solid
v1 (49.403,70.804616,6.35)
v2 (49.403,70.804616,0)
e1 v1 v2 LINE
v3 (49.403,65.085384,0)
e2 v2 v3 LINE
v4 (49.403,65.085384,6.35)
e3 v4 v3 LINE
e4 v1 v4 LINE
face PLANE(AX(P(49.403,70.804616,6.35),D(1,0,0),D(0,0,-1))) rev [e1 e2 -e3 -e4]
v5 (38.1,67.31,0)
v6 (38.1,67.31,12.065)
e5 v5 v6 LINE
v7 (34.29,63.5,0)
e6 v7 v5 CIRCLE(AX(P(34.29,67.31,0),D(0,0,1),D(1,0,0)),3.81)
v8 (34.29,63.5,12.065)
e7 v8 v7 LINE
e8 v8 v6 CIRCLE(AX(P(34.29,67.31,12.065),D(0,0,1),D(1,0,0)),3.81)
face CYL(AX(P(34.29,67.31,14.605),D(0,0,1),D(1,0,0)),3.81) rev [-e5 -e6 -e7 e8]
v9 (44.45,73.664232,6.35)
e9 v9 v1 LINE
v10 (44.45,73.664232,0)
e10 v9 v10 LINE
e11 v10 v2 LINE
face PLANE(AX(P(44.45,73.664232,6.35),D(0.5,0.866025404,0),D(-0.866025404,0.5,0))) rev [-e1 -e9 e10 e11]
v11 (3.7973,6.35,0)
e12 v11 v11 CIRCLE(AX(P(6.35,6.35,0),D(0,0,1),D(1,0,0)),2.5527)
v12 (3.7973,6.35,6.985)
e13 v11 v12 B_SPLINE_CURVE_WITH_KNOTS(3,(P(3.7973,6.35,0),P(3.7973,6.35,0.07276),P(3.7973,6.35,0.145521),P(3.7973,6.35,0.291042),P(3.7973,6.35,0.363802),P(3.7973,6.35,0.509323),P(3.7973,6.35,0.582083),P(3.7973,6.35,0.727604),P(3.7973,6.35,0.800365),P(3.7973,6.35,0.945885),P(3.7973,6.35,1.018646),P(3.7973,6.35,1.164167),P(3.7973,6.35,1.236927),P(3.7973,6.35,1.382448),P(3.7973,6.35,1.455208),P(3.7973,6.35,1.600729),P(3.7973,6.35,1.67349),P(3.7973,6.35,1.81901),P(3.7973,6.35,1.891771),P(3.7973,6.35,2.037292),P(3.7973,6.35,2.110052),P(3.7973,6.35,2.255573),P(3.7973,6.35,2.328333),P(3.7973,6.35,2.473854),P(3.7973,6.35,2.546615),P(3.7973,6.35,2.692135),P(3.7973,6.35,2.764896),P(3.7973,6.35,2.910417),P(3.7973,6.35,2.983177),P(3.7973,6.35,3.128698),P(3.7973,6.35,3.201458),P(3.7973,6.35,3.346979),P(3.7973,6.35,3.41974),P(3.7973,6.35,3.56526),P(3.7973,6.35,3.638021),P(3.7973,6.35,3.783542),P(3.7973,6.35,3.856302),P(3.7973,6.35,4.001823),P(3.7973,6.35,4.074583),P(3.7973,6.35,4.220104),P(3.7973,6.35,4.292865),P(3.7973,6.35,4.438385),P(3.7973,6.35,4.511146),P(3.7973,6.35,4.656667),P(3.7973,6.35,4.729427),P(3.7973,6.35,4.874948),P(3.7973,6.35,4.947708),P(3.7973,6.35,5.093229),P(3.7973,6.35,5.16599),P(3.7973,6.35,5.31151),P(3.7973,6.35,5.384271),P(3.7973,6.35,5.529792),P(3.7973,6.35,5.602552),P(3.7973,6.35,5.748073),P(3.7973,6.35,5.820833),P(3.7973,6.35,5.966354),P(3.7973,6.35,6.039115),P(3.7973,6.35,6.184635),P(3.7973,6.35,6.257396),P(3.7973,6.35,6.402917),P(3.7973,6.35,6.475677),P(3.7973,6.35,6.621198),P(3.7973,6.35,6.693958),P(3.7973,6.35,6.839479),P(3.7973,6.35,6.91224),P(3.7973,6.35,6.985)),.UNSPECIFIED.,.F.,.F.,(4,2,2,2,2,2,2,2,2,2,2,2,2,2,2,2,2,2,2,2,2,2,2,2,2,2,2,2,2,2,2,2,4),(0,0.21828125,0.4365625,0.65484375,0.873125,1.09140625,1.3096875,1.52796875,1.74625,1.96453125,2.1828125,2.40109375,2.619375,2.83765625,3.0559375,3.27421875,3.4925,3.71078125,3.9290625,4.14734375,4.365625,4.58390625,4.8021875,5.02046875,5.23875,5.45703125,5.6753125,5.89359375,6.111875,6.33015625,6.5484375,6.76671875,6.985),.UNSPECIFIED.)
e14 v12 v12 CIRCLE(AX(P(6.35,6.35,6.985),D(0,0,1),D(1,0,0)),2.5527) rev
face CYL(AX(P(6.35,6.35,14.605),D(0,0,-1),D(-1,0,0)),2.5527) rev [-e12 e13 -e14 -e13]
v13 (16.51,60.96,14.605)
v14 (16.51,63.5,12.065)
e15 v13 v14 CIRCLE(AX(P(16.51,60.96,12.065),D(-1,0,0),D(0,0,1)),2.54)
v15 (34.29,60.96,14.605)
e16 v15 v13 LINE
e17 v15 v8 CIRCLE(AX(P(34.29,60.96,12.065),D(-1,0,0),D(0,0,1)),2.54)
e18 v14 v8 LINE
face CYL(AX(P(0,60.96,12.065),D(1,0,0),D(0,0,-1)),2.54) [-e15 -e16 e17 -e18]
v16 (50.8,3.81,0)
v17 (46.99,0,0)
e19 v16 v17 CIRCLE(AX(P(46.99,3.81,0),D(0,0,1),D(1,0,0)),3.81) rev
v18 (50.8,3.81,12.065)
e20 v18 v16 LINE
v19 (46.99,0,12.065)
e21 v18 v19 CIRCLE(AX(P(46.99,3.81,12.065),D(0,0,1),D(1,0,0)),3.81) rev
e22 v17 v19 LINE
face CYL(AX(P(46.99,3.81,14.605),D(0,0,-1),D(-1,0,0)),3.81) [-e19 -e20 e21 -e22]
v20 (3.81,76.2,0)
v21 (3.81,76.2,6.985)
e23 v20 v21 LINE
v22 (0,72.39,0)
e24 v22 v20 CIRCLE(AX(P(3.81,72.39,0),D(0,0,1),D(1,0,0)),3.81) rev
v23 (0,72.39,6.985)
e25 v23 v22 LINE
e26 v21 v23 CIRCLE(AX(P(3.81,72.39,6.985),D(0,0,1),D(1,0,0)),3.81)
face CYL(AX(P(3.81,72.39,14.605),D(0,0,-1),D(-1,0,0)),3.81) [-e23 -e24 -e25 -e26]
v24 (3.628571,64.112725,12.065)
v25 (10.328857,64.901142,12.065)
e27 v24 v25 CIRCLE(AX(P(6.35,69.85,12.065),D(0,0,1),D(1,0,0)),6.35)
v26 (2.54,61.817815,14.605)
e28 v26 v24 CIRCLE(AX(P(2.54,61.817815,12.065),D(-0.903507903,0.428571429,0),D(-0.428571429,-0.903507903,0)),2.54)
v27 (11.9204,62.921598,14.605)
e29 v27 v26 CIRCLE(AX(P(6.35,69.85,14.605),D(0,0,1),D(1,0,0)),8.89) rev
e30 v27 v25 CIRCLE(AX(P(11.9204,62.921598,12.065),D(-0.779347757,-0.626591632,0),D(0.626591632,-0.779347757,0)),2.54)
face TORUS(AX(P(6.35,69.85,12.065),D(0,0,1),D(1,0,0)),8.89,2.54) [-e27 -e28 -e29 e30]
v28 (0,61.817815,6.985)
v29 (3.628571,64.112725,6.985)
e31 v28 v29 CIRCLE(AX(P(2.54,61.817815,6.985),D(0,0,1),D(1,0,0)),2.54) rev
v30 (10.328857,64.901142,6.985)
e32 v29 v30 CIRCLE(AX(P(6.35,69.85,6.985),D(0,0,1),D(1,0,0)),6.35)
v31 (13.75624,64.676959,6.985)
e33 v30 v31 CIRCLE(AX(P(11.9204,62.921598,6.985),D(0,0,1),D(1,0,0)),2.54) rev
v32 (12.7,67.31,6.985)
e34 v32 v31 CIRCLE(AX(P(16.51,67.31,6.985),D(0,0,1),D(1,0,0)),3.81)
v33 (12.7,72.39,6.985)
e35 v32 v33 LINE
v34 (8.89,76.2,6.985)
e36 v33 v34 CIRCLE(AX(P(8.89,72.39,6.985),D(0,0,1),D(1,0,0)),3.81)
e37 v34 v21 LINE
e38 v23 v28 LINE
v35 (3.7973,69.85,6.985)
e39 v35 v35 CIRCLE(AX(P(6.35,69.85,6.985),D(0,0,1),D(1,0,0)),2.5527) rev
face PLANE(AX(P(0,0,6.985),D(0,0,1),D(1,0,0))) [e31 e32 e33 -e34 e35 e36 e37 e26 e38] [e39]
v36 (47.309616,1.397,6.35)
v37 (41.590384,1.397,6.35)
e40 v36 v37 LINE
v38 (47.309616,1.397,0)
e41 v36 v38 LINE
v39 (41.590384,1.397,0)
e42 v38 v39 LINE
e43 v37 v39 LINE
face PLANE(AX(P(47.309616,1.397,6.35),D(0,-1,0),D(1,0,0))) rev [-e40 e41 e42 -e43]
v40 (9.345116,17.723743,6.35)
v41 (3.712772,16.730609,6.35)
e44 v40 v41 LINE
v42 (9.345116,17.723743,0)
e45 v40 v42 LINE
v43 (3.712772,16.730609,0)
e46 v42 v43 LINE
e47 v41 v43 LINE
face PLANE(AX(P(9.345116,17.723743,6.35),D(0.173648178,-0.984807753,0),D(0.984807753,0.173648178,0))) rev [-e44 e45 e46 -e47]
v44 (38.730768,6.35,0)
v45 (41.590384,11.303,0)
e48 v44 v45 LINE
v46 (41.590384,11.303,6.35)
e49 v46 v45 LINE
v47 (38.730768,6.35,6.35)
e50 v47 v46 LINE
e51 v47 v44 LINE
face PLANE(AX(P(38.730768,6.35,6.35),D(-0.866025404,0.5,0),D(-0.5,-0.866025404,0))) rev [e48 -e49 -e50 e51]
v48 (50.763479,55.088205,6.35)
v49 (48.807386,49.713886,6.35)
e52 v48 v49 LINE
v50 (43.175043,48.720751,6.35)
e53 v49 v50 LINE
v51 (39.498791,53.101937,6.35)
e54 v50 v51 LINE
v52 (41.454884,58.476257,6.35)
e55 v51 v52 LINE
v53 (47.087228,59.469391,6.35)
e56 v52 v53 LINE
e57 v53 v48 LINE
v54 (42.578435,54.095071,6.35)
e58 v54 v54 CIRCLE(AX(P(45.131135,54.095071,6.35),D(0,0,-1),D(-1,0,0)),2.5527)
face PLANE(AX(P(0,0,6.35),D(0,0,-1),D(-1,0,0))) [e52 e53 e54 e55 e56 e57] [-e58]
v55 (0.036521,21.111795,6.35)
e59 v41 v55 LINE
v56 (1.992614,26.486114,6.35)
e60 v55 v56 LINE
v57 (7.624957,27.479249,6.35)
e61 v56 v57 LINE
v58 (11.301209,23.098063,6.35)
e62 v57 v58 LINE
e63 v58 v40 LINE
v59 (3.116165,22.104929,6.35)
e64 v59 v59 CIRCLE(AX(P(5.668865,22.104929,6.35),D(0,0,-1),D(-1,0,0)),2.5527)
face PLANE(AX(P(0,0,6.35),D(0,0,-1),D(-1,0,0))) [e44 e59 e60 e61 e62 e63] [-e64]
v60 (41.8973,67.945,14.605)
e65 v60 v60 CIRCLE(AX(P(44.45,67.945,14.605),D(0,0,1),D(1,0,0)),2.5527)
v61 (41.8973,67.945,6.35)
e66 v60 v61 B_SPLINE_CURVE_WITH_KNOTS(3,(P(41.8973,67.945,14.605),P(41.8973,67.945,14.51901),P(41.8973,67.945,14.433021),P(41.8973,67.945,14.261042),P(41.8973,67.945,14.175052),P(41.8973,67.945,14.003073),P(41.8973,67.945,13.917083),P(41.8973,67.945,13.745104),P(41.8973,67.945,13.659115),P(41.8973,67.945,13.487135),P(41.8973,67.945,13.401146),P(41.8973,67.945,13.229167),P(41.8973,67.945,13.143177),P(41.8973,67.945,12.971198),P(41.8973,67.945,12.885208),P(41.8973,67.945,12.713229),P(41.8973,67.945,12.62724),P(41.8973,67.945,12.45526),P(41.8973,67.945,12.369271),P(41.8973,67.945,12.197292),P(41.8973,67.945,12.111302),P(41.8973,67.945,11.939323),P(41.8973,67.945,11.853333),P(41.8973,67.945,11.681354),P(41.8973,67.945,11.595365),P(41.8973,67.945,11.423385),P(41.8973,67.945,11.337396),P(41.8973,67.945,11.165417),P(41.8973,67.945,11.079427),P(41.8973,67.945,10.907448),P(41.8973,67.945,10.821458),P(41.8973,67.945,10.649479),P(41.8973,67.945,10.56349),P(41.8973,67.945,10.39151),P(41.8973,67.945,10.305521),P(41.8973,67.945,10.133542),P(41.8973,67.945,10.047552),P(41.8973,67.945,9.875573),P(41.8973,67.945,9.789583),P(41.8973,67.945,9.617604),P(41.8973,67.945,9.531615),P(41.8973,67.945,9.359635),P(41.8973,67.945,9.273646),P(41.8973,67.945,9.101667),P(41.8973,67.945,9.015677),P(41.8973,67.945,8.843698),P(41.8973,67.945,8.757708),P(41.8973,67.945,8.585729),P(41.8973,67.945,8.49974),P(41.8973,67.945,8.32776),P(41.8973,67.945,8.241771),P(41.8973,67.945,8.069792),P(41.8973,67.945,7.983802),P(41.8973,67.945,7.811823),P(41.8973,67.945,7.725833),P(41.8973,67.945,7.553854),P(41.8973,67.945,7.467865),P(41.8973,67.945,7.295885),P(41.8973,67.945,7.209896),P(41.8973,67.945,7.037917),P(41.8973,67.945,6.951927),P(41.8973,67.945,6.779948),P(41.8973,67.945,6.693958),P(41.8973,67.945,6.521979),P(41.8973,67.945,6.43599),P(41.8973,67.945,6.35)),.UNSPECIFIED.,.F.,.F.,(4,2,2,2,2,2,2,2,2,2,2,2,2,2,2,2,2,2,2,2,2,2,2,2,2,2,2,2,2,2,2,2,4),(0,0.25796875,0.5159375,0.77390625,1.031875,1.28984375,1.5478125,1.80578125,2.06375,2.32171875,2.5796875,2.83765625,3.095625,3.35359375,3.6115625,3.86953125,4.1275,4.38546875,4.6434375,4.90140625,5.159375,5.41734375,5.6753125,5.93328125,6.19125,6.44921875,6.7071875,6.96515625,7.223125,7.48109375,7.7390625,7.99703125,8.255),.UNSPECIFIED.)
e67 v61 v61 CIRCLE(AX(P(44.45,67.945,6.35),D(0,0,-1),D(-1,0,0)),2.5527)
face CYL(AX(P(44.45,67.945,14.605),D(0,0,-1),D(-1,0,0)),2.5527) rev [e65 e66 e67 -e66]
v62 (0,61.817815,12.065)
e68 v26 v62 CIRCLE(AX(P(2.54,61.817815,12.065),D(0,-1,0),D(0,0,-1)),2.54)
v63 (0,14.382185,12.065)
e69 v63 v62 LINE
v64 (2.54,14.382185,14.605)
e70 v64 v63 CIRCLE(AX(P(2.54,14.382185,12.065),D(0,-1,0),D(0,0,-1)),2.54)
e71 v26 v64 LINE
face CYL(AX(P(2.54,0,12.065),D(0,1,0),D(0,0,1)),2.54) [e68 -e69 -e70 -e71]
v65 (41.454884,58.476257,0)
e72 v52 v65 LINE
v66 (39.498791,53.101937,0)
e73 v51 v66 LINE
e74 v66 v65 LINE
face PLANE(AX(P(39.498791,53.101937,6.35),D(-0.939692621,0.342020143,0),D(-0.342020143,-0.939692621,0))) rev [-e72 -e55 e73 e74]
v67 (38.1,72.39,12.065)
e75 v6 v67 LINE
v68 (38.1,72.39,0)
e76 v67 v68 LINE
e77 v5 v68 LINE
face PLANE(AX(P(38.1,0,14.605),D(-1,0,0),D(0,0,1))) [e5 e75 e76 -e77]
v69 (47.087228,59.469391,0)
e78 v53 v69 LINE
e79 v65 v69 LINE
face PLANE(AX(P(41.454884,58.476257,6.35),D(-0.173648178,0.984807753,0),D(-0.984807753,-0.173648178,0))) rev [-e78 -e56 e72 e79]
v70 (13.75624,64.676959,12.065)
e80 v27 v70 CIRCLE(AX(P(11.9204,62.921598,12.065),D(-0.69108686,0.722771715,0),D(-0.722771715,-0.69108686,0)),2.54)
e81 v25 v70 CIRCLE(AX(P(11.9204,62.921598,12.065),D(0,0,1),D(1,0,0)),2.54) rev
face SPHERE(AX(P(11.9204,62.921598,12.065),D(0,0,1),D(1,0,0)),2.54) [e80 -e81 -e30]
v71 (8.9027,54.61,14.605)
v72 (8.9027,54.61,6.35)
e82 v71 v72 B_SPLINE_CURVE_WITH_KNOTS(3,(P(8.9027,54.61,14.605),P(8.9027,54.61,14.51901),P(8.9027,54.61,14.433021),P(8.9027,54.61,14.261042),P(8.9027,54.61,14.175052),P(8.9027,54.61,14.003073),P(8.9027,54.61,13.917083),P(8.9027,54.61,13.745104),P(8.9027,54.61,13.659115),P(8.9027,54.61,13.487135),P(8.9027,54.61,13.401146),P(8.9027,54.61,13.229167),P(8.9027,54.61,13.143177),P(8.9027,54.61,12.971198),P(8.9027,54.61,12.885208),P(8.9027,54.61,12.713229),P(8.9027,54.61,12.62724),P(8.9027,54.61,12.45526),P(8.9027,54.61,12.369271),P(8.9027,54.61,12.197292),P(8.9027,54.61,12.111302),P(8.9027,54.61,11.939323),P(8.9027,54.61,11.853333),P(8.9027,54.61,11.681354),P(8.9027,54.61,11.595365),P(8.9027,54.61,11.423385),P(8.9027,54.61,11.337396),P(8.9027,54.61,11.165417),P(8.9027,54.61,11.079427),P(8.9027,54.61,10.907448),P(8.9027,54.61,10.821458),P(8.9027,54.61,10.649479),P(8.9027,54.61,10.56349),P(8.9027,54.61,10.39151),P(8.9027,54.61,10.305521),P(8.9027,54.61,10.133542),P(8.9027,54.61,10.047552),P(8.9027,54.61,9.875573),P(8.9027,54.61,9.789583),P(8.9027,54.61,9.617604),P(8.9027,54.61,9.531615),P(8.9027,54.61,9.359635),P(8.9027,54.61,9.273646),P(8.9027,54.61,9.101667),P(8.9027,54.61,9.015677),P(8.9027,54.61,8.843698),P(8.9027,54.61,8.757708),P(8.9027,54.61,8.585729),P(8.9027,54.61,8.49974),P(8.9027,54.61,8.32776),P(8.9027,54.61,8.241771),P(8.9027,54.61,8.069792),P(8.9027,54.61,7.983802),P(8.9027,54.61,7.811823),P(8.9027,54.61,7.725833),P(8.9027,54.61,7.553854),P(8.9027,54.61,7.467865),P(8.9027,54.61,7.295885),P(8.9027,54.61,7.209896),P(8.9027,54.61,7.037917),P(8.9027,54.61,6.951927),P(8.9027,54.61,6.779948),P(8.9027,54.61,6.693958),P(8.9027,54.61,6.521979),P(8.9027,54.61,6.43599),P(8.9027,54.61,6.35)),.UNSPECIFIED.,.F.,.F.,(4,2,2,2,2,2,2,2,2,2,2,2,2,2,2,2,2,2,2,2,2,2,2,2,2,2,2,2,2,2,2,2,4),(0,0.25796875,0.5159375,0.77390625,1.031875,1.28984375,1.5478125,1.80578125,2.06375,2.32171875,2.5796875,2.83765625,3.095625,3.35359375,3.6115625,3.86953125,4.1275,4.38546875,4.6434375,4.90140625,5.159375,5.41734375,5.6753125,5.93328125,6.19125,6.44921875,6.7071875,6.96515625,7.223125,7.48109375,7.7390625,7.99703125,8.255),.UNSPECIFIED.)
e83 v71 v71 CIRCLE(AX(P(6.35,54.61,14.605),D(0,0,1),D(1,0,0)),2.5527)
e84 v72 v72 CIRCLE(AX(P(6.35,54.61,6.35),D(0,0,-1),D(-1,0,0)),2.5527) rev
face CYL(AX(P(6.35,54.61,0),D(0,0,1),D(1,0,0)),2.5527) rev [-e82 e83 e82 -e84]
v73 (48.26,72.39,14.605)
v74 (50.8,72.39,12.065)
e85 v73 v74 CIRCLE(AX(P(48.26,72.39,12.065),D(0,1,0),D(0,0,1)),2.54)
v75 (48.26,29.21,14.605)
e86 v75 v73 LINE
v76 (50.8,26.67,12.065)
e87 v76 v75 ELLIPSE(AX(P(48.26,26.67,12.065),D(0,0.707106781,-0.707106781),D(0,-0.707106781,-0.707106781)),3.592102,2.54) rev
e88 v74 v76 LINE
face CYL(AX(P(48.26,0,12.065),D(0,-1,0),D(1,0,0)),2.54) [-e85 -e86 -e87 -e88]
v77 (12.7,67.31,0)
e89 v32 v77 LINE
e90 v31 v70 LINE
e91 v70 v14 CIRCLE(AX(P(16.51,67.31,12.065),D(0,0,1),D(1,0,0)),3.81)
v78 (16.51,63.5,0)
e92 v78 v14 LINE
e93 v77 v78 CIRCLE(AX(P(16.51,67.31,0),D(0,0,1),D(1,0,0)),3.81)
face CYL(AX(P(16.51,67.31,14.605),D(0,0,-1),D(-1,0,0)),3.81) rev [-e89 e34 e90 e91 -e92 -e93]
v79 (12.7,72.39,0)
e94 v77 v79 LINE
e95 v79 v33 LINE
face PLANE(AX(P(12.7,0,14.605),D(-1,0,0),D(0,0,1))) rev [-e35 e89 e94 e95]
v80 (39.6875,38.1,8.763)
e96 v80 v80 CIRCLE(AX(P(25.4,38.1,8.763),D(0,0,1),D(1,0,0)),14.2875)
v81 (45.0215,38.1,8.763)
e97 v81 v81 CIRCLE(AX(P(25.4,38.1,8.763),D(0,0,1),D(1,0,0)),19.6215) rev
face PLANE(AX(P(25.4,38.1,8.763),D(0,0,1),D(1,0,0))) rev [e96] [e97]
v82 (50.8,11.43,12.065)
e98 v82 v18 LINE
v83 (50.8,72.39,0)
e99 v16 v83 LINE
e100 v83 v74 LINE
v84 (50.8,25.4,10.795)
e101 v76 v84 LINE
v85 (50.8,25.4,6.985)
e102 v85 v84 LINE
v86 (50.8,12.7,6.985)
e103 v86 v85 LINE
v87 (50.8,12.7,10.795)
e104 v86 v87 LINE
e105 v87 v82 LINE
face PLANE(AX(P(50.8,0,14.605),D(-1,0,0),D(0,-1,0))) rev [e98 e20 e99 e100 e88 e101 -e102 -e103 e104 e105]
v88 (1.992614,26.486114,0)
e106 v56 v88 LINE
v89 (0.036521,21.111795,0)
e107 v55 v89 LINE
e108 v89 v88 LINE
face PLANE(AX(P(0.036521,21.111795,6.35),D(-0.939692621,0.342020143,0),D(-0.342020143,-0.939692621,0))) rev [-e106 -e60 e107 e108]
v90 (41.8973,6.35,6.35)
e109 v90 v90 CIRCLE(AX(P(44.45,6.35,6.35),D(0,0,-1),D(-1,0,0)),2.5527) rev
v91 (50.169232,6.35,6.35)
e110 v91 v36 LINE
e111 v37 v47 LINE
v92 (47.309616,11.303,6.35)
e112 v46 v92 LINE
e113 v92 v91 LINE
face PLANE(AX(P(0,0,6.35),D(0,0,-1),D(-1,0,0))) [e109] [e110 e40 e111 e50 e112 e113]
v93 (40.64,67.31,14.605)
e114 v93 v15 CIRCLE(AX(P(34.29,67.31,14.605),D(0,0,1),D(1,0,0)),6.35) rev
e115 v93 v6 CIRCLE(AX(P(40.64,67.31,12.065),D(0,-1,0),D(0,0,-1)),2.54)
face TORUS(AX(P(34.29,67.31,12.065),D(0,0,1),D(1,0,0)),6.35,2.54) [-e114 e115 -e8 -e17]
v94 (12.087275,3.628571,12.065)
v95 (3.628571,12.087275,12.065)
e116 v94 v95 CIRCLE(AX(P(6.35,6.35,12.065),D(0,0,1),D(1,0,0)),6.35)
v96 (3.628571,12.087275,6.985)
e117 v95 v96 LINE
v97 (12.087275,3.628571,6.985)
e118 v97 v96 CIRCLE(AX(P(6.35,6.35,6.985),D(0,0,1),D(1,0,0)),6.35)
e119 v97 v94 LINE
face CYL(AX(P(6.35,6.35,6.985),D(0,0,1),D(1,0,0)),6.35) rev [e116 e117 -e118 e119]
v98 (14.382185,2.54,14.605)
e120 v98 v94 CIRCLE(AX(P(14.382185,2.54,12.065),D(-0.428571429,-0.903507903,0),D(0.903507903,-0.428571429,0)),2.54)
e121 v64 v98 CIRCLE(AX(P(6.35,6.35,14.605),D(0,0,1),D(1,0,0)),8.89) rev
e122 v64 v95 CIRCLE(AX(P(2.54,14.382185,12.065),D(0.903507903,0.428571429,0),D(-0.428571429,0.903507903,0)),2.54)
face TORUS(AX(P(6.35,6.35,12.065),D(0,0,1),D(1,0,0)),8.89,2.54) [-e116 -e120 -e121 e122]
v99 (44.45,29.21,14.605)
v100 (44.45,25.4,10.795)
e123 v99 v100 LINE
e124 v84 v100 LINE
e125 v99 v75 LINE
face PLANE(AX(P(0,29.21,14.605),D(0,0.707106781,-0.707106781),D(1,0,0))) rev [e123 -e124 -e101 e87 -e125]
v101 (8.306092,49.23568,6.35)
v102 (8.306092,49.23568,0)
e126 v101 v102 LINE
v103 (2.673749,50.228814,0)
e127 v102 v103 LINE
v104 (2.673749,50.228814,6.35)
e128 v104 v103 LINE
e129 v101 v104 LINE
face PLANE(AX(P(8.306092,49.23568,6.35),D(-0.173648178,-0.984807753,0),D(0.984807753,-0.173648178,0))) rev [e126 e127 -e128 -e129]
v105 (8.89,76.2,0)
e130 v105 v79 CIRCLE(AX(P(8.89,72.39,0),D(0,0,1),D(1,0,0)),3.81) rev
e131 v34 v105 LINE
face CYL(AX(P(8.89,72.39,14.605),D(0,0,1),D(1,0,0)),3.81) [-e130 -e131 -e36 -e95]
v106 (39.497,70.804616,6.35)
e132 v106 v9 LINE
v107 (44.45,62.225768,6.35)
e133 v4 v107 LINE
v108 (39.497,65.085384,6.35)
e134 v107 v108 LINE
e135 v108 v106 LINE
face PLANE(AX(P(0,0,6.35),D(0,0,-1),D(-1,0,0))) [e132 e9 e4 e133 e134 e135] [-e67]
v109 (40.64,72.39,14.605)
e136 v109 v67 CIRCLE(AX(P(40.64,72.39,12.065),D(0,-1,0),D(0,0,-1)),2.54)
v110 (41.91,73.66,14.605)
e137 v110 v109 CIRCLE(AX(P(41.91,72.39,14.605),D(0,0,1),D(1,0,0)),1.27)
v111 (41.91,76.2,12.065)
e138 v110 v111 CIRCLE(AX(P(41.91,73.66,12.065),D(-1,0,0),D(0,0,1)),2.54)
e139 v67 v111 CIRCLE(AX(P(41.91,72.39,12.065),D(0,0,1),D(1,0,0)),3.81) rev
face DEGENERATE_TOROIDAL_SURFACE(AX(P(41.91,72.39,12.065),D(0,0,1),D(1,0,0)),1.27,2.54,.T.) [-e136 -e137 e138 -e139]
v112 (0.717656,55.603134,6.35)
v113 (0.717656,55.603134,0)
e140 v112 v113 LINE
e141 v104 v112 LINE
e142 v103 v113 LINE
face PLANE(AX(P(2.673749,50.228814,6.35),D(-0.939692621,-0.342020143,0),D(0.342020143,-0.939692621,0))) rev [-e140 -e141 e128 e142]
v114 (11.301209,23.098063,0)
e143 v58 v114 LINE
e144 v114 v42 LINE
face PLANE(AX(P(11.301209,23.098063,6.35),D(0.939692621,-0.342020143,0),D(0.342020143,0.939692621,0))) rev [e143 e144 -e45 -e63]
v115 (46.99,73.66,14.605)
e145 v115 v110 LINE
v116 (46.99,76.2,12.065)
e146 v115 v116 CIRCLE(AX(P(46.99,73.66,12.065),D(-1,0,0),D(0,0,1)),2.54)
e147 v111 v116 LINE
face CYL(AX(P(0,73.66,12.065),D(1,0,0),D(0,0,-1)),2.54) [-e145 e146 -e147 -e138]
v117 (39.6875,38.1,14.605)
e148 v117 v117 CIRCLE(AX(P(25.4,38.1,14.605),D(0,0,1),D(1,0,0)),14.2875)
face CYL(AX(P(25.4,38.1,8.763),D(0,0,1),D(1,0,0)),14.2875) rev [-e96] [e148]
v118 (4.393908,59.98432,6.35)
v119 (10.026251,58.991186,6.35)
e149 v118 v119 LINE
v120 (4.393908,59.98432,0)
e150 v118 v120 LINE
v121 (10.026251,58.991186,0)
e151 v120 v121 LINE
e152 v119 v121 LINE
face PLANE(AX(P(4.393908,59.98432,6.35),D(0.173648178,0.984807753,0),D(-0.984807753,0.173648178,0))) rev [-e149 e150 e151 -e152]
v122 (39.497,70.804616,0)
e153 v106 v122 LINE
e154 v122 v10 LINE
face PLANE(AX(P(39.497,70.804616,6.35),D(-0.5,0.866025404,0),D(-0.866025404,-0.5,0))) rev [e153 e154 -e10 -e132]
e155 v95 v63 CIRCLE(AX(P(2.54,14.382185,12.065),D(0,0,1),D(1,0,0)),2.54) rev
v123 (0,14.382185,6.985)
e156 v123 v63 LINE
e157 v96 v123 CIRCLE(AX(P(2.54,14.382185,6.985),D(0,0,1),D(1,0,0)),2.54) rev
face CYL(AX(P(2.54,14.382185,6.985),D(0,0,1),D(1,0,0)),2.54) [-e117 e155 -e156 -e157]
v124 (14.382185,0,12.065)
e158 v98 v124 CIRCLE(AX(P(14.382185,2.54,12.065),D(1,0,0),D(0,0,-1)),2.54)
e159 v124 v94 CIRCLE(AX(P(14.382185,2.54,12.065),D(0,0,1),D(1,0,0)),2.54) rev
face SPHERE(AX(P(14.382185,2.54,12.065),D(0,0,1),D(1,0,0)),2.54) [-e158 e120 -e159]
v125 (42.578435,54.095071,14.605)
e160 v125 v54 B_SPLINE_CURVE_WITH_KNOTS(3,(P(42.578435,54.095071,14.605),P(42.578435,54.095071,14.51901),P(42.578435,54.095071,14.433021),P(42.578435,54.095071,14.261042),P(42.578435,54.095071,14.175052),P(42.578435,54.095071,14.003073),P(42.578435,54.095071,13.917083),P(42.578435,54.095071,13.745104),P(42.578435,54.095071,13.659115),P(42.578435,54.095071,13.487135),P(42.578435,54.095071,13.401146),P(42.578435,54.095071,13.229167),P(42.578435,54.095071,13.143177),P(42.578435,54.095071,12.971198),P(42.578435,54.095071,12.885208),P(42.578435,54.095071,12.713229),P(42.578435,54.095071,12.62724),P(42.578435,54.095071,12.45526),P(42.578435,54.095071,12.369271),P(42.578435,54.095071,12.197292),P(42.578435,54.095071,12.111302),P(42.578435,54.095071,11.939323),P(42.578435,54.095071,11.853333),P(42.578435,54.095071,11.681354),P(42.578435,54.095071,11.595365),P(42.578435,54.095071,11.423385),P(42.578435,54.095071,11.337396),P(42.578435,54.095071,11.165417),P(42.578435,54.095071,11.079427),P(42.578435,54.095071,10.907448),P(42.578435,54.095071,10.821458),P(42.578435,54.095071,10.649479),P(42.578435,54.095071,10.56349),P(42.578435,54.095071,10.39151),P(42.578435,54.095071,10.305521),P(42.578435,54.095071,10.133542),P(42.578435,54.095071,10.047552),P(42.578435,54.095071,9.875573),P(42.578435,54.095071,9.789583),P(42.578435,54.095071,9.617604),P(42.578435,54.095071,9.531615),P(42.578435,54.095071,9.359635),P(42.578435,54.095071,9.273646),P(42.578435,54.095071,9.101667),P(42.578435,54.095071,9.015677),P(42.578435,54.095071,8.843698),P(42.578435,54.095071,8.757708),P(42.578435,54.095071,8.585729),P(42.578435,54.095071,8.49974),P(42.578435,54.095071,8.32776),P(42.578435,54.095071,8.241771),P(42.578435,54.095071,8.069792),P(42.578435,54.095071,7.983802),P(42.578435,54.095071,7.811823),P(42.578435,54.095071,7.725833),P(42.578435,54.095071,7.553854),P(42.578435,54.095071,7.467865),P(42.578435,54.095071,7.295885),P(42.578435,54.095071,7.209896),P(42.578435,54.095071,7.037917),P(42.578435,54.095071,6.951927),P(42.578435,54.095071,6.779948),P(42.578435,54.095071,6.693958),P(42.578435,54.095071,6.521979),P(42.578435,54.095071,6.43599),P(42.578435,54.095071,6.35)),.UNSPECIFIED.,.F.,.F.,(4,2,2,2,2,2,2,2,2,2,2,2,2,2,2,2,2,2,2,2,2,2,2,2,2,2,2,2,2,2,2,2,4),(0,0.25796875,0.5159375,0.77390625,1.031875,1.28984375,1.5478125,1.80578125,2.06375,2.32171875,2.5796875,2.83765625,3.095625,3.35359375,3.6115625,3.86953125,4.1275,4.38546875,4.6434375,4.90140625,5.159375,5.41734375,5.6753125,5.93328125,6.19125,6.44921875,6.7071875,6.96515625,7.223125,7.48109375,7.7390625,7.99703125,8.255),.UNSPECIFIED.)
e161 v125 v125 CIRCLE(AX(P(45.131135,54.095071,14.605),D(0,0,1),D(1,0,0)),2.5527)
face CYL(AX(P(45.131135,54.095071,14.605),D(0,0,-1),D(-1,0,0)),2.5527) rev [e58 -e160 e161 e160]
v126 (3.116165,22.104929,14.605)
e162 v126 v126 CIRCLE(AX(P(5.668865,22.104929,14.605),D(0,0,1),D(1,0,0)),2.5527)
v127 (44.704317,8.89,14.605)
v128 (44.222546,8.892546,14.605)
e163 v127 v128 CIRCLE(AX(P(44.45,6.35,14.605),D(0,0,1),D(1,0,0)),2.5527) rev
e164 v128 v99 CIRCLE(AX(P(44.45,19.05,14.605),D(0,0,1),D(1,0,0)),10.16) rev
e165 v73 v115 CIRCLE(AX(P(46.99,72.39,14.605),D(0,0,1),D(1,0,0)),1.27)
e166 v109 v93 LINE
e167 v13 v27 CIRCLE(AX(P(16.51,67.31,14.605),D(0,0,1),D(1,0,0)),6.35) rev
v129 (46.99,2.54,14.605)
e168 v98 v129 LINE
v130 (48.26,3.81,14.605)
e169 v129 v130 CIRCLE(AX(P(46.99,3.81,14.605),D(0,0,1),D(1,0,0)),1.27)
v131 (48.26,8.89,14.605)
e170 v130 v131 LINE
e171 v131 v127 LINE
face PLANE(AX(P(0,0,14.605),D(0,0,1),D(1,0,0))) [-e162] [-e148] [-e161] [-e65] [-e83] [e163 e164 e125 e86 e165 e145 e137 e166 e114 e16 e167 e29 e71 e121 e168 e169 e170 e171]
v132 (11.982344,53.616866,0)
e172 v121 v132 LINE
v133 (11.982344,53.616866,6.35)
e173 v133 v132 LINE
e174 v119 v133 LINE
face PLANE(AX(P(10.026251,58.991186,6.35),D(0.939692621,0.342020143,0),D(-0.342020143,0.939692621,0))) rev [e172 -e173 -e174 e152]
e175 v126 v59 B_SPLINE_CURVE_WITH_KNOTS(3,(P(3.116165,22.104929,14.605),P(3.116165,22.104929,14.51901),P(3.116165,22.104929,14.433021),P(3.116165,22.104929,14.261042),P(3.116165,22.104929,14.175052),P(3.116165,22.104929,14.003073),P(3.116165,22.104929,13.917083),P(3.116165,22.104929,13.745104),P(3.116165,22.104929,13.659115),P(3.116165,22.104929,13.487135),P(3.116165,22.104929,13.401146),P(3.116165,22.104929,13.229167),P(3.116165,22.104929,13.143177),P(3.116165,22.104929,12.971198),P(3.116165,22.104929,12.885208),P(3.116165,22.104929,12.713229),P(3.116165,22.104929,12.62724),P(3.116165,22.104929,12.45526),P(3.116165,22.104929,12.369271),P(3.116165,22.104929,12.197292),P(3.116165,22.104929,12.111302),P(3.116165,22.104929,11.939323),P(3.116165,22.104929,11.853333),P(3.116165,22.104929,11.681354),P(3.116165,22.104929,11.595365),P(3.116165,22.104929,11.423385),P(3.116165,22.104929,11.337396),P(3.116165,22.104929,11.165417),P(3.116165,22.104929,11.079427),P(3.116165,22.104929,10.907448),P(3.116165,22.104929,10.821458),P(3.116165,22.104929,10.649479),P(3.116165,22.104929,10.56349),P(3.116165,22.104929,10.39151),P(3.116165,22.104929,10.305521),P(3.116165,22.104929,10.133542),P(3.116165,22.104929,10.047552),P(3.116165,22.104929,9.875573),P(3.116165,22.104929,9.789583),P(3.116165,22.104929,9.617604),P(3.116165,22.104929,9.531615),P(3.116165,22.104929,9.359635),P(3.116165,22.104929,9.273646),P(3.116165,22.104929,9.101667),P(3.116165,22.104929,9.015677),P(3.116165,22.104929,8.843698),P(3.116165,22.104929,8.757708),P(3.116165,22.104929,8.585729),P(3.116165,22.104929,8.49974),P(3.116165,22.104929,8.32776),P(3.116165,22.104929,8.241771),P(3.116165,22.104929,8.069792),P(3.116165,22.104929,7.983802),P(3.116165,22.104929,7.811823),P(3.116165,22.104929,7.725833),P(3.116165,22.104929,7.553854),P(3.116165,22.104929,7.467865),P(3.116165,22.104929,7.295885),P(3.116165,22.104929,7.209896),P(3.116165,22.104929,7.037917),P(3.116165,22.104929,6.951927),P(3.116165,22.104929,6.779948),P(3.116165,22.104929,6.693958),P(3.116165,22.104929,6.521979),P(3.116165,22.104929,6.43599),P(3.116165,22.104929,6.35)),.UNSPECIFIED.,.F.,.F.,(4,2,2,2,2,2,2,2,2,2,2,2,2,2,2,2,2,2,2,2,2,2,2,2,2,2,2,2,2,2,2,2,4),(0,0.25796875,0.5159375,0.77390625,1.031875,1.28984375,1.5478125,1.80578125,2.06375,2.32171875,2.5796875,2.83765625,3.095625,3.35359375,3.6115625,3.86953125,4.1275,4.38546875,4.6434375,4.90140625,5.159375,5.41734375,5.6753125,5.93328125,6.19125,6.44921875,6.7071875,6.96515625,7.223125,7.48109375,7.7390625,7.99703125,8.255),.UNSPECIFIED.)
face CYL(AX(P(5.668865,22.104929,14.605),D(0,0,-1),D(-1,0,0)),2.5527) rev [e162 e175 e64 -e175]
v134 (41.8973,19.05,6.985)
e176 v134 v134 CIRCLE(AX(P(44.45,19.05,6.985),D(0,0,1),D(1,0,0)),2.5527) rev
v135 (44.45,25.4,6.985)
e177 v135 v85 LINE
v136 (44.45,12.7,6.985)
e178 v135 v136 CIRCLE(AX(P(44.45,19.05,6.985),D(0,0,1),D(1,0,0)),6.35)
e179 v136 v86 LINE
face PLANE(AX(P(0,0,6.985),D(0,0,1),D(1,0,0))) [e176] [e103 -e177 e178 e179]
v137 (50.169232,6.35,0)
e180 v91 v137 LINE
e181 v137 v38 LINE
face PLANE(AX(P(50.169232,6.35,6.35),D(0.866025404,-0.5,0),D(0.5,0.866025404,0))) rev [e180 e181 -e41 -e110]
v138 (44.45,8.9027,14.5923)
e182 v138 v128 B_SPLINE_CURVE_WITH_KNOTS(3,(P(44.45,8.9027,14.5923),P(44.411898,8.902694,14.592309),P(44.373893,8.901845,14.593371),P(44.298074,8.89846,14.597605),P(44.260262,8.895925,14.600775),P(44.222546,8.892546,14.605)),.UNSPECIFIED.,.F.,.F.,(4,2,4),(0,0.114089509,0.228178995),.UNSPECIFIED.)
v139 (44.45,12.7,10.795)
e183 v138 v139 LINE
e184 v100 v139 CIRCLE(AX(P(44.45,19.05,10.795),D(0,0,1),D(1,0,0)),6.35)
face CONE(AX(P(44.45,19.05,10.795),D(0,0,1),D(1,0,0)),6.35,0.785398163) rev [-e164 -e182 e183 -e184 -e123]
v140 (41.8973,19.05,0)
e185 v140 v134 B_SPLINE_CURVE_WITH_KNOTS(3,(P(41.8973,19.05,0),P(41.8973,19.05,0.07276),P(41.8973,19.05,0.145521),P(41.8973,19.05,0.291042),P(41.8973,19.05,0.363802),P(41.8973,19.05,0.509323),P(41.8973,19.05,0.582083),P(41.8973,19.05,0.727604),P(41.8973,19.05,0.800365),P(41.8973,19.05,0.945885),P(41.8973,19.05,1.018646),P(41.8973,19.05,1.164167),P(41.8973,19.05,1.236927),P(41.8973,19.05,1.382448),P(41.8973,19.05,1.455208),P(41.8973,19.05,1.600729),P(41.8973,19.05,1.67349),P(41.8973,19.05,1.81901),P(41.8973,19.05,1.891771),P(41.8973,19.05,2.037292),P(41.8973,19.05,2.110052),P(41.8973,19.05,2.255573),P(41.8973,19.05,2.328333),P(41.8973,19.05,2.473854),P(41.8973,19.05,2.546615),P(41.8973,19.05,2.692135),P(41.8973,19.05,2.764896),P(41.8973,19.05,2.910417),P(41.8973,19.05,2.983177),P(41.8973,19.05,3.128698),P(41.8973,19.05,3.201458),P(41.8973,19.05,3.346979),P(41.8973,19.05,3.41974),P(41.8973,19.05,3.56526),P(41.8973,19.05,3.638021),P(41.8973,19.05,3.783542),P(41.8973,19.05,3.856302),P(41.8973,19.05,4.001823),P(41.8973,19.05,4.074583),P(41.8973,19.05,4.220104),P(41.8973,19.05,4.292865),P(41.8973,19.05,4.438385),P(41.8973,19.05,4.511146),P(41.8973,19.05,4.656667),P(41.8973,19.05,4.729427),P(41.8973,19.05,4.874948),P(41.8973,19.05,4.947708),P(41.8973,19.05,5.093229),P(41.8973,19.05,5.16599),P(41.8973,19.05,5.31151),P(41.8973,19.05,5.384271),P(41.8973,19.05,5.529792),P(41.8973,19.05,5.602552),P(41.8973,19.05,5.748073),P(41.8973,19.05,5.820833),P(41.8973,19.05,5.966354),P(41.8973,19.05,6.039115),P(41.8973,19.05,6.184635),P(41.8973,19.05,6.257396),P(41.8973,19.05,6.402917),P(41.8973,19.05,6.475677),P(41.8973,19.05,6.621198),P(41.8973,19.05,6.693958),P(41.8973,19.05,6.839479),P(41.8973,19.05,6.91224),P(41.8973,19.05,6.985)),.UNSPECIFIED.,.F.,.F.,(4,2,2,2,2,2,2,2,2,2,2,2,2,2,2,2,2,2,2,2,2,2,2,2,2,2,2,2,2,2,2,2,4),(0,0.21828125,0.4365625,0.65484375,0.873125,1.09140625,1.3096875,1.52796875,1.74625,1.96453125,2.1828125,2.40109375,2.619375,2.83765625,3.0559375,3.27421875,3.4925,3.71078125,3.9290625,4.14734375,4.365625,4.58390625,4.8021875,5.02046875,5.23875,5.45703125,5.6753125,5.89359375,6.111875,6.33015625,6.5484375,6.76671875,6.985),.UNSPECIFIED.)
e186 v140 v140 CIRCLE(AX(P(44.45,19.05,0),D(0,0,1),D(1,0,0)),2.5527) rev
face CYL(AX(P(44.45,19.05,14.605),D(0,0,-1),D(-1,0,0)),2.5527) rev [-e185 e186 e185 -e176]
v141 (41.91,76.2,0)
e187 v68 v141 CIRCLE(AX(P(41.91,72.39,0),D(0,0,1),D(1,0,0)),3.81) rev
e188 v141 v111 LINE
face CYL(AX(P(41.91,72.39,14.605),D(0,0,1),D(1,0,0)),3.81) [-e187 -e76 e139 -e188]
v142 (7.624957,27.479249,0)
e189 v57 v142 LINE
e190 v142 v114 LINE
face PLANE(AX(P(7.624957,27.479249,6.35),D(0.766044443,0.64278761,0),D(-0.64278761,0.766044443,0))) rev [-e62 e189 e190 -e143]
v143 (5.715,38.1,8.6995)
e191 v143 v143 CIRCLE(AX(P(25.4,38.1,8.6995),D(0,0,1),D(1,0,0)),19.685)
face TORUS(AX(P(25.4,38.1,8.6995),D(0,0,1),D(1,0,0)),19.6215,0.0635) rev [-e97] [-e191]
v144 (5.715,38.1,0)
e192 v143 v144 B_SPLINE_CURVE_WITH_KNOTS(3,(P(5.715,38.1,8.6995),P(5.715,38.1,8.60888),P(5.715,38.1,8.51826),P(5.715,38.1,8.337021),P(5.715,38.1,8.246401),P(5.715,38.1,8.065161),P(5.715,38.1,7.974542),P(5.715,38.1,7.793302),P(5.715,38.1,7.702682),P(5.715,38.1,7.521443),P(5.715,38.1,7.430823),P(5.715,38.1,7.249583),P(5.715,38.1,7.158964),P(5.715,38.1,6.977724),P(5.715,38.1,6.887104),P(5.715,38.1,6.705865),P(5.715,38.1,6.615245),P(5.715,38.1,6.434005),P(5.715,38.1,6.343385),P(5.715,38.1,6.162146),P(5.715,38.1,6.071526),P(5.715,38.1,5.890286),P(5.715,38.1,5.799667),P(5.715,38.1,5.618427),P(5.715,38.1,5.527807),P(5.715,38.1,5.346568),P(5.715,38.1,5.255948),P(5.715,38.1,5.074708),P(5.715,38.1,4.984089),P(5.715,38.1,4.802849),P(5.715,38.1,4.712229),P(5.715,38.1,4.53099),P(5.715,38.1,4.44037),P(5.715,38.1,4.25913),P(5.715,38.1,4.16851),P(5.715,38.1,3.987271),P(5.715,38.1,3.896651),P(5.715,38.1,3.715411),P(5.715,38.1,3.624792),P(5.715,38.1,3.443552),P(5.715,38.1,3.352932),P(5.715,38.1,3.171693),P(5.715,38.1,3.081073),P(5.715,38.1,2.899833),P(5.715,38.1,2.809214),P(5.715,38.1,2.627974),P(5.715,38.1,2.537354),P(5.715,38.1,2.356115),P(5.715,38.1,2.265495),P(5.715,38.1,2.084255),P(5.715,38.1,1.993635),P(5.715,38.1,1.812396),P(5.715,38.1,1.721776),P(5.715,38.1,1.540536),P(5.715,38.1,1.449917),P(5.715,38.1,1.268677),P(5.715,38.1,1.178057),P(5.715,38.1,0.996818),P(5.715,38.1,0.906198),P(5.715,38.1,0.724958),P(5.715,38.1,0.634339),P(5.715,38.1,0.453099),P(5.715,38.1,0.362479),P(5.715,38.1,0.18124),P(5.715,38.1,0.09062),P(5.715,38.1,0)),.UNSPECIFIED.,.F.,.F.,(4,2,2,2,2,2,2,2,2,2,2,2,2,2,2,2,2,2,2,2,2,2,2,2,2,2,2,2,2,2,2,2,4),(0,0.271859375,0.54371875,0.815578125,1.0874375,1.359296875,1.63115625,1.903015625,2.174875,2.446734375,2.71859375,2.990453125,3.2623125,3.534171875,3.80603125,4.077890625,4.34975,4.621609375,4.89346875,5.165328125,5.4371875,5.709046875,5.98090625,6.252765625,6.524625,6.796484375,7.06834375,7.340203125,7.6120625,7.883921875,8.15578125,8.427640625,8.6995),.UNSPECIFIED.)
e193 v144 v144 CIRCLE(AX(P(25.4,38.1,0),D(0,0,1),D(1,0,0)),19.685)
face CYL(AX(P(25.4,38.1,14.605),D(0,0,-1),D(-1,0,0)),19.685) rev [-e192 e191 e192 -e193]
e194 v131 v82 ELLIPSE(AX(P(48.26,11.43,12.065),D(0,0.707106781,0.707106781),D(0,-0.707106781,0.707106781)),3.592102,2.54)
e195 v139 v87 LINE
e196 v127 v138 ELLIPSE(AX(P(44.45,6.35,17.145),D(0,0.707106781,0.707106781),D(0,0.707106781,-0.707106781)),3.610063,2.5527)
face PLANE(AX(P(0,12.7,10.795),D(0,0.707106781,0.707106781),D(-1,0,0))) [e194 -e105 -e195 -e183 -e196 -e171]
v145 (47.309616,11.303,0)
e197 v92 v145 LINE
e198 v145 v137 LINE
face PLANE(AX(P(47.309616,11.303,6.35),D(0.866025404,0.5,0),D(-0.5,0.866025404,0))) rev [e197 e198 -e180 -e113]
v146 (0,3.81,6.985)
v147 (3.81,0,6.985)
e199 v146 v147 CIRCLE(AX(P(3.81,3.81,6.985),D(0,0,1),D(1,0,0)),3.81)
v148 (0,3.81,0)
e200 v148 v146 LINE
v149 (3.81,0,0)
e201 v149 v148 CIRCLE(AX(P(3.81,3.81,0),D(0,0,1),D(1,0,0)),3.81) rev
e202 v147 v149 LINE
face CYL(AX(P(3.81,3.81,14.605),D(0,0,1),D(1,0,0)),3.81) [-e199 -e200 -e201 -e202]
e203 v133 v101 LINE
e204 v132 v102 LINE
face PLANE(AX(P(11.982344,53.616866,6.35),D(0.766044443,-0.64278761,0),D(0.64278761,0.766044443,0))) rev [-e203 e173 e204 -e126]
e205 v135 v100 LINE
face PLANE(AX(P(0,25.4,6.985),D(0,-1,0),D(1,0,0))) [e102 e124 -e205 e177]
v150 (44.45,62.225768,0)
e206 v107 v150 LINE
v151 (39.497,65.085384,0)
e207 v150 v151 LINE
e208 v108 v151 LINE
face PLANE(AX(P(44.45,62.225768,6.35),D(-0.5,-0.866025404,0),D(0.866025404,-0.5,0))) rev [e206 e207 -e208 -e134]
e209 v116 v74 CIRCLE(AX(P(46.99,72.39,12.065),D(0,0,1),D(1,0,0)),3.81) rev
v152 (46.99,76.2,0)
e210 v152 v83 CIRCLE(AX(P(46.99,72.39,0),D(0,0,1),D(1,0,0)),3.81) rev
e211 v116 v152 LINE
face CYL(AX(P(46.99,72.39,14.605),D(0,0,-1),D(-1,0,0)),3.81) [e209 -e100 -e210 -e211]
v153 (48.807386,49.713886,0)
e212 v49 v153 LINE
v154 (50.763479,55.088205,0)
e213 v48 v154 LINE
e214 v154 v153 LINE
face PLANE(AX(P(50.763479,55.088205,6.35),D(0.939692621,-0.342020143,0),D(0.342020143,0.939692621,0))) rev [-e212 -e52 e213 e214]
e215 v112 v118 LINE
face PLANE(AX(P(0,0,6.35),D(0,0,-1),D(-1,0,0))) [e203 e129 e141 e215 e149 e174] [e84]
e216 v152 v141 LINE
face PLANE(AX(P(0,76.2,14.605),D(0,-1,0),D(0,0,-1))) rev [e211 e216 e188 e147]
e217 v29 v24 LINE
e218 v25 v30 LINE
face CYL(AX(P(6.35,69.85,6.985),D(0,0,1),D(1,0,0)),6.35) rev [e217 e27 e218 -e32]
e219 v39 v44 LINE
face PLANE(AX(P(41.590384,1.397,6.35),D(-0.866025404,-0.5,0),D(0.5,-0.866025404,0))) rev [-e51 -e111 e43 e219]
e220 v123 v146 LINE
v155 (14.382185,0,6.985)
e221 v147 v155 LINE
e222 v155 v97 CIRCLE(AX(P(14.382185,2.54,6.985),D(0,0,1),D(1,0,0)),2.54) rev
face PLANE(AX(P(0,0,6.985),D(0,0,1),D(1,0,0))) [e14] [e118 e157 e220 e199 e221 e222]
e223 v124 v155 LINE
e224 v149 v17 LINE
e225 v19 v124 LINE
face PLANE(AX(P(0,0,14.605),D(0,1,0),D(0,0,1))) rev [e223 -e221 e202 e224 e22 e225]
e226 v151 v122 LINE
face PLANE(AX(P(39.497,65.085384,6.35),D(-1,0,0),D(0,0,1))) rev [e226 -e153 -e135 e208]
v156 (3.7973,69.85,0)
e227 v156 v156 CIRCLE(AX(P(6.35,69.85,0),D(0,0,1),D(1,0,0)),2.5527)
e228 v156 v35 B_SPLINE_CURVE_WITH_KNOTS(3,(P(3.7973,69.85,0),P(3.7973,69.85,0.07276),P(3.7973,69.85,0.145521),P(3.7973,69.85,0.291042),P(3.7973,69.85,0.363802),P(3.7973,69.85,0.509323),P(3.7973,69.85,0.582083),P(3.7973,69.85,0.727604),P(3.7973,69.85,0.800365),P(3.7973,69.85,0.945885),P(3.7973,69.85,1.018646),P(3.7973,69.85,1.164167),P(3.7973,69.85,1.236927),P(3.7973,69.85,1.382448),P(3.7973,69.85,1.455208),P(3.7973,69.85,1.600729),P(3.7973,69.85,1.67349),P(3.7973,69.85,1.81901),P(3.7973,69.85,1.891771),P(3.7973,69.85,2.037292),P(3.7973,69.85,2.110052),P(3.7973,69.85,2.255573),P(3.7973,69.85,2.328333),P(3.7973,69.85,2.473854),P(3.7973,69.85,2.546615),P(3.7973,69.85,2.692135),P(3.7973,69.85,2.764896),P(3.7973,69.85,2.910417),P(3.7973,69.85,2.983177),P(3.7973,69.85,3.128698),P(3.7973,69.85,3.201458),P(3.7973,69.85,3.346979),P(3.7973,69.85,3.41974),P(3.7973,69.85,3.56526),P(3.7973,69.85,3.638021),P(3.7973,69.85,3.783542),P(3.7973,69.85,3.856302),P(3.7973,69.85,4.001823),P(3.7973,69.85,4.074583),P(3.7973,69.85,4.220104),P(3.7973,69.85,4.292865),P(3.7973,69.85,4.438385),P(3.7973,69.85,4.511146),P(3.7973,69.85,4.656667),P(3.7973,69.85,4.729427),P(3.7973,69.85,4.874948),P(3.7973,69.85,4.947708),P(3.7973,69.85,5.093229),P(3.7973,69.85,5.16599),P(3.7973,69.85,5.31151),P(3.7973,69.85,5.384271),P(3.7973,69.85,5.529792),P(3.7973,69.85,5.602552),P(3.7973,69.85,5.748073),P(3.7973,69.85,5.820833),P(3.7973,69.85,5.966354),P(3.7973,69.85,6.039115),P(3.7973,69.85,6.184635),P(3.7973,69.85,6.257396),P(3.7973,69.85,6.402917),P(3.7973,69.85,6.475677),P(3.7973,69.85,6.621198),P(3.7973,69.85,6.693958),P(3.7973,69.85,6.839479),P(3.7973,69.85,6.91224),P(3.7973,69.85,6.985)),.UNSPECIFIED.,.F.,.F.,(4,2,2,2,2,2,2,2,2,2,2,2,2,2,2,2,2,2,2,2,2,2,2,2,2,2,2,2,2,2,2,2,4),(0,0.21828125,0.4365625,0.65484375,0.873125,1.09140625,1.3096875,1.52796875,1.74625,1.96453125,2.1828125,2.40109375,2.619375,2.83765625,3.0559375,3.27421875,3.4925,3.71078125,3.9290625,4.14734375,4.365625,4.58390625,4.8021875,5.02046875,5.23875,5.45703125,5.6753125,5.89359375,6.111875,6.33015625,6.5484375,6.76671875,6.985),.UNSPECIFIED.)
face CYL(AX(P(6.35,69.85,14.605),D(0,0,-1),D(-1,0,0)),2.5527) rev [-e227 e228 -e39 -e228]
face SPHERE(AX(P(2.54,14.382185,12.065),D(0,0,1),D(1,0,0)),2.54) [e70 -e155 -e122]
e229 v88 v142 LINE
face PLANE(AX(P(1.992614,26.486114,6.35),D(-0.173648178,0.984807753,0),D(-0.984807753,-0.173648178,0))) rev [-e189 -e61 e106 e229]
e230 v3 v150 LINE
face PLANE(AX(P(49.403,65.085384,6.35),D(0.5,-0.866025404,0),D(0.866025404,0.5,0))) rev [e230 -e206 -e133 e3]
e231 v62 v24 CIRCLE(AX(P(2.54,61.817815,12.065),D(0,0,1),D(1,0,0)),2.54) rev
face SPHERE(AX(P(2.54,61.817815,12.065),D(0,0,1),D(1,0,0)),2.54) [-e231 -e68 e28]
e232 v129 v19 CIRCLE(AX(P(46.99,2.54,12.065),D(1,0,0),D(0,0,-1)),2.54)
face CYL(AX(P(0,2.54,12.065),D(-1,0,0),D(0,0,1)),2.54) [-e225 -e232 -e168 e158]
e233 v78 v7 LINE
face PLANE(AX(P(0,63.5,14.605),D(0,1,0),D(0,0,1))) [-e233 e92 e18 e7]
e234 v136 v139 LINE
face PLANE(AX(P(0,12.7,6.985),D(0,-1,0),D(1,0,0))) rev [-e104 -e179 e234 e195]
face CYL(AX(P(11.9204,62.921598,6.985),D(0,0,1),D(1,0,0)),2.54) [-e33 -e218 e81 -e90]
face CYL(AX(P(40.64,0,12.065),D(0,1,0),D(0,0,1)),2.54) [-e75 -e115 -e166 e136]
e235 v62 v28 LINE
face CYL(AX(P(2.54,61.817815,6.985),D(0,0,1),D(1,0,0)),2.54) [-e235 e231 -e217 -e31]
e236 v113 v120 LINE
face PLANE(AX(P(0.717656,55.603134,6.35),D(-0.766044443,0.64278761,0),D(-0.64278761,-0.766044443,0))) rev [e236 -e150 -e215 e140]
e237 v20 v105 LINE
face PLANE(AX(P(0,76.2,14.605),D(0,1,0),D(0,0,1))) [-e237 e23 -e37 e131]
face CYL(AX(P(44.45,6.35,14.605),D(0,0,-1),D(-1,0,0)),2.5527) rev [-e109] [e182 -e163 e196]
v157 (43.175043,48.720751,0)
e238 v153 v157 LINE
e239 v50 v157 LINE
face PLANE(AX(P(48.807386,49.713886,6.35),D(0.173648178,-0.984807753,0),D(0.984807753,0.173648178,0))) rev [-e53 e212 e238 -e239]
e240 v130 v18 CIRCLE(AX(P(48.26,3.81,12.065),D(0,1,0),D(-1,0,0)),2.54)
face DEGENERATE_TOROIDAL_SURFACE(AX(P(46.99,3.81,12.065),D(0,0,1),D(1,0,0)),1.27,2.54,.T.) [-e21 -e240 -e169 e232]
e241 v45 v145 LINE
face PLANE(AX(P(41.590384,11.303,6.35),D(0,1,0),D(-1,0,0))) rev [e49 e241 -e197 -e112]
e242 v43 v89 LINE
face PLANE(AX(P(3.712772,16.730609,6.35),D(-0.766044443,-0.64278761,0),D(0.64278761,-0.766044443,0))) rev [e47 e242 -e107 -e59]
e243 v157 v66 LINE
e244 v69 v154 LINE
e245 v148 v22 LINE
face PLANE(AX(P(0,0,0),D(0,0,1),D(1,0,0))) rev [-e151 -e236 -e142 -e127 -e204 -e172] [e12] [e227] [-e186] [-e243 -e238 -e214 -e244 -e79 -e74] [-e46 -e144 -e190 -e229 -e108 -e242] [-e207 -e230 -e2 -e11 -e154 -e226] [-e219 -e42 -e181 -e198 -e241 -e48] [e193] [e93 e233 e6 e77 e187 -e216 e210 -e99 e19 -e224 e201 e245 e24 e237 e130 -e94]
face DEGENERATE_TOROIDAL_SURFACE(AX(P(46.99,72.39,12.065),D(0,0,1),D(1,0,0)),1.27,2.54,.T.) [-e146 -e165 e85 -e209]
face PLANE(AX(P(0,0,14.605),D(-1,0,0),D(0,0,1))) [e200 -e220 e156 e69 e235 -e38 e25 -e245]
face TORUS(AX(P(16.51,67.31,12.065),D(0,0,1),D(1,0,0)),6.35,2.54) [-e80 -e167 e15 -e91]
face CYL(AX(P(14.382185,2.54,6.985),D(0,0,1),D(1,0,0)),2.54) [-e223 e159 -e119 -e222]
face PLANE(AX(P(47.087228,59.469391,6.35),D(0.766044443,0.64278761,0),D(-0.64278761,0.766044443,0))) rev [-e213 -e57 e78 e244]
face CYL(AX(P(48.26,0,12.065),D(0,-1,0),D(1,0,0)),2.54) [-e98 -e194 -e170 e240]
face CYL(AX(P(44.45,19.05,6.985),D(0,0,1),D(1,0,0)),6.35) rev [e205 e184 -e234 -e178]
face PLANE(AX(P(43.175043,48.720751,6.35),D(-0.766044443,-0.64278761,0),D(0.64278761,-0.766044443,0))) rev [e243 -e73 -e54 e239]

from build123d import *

# Parameters (mm, degrees)
SKETCH1_R           = 2.5527
SKETCH1_R_2         = 19.685
SKETCH1_W           = 12.7
SKETCH1_H           = 12.7
BOSS_EXTRUDE1_DEPTH = 14.605
CUT_EXTRUDE1_DEPTH  = 6.35
BOSS_EXTRUDE2_START = -5.842
SKETCH3_R           = 19.685
SKETCH3_R_2         = 14.2875
BOSS_EXTRUDE2_DEPTH = 5.842
SKETCH4_R           = 2.5527
CUT_EXTRUDE2_DEPTH  = 93.738266239
CUT_EXTRUDE3_DEPTH  = 6.35
CUT_EXTRUDE4_START  = -7.62
SKETCH8_R           = 2.5527
CUT_EXTRUDE4_DEPTH  = 7.62
FILLET1_R           = 3.81
FILLET3_R           = 0.0635
FILLET4_START       = 6.985
FILLET4_DEPTH       = 9.015
CHAMFER1_SIZE       = 3.81
FILLET5_R           = 2.54


with BuildPart() as part:
    # Sketch1 → Boss-Extrude1 (new body)
    # profile 1 of 3: a face of its own
    with BuildSketch(Plane.XY):
        Polygon((0, 63.5), (0, 0), (50.8, 0), (50.8, 63.5), (38.1, 63.5), (12.7, 63.5), align=None)
        with Locations(Location((6.35, 6.35, 0), (0, 0, 180))):
            Circle(SKETCH1_R, mode=Mode.SUBTRACT)
        with Locations(Location((5.668864874, 22.104928677, 0), (0, 0, 180))):
            Circle(SKETCH1_R, mode=Mode.SUBTRACT)
        with Locations(Location((44.45, 6.35, 0), (0, 0, 180))):
            Circle(SKETCH1_R, mode=Mode.SUBTRACT)
        with Locations(Location((44.45, 19.05, 0), (0, 0, 180))):
            Circle(SKETCH1_R, mode=Mode.SUBTRACT)
        with Locations(Location((25.4, 38.1, 0), (0, 0, 180))):
            Circle(SKETCH1_R_2, mode=Mode.SUBTRACT)
        with Locations(Location((45.131135126, 54.095071323, 0), (0, 0, 180))):
            Circle(SKETCH1_R, mode=Mode.SUBTRACT)
    # profile 2 of 3: a face of its own
    with BuildSketch(Plane.XY):
        with Locations((6.35, 69.85)):
            Rectangle(SKETCH1_W, SKETCH1_H)
        with Locations(Location((6.35, 69.85, 0), (0, 0, 180))):
            Circle(SKETCH1_R, mode=Mode.SUBTRACT)
    # profile 3 of 3: a face of its own
    with BuildSketch(Plane.XY):
        with Locations((44.45, 69.85)):
            Rectangle(SKETCH1_W, SKETCH1_H)
        with Locations(Location((44.45, 67.945, 0), (0, 0, 180))):
            Circle(SKETCH1_R, mode=Mode.SUBTRACT)
    extrude(amount=BOSS_EXTRUDE1_DEPTH)

    # Sketch2 → Cut-Extrude1 (cut)
    with BuildSketch(Plane(origin=(0, 0, 0), x_dir=(-1, 0, 0), z_dir=(0, 0, -1))):
        Polygon((-41.45488381, 58.476257037), (-47.087227595, 59.469391211), (-50.763478911, 55.088205497), (-48.807386443, 49.713885609), (-43.175042658, 48.720751435), (-39.498791341, 53.101937149), align=None)
        Polygon((-1.992613557, 26.486114391), (-7.624957342, 27.479248565), (-11.301208659, 23.098062851), (-9.34511619, 17.723742963), (-3.712772405, 16.730608789), (-0.036521089, 21.111794503), align=None)
        Polygon((-41.590384117, 11.303), (-47.309615883, 11.303), (-50.169231767, 6.35), (-47.309615883, 1.397), (-41.590384117, 1.397), (-38.730768233, 6.35), align=None)
        Polygon((-44.45, 73.664231767), (-49.403, 70.804615883), (-49.403, 65.085384117), (-44.45, 62.225768233), (-39.497, 65.085384117), (-39.497, 70.804615883), align=None)
    extrude(amount=-CUT_EXTRUDE1_DEPTH, mode=Mode.SUBTRACT)

    # Sketch3 → Boss-Extrude2 (add)
    with BuildSketch(Plane.XY.offset(14.605).offset(BOSS_EXTRUDE2_START)):
        with Locations(Location((25.4, 38.1, 0), (0, 0, 180))):
            Circle(SKETCH3_R)
        with Locations((25.4, 38.1)):
            Circle(SKETCH3_R_2, mode=Mode.SUBTRACT)
    extrude(amount=BOSS_EXTRUDE2_DEPTH)

    # Sketch4 → Cut-Extrude2 (cut, through all)
    with BuildSketch(Plane.XY.offset(14.605)):
        with Locations((6.35, 54.61)):
            Circle(SKETCH4_R)
    extrude(amount=-CUT_EXTRUDE2_DEPTH, mode=Mode.SUBTRACT)

    # Sketch5 → Cut-Extrude3 (cut)
    with BuildSketch(Plane(origin=(0, 0, 0), x_dir=(-1, 0, 0), z_dir=(0, 0, -1))):
        Polygon((-2.673748684, 50.228814286), (-0.717656215, 55.603134174), (-4.393907531, 59.984319888), (-10.026251316, 58.991185714), (-11.982343785, 53.616865826), (-8.306092469, 49.235680112), align=None)
    extrude(amount=-CUT_EXTRUDE3_DEPTH, mode=Mode.SUBTRACT)

    # Sketch8 → Cut-Extrude4 (cut)
    # profile 1 of 3: a face of its own
    with BuildSketch(Plane.XY.offset(14.605).offset(CUT_EXTRUDE4_START)):
        with BuildLine():
            Line((0, 76.2), (0, 69.85))
            ThreePointArc((0, 69.85), (6.35, 63.5), (12.7, 69.85))
            Line((12.7, 69.85), (12.7, 76.2))
            Line((12.7, 76.2), (0, 76.2))
        make_face()
        with Locations(Location((6.35, 69.85, 0), (0, 0, 180))):
            Circle(SKETCH8_R, mode=Mode.SUBTRACT)
    # profile 2 of 3: a face of its own
    with BuildSketch(Plane.XY.offset(14.605).offset(CUT_EXTRUDE4_START)):
        with BuildLine():
            Line((50.8, 25.4), (44.45, 25.4))
            ThreePointArc((44.45, 25.4), (38.1, 19.05), (44.45, 12.7))
            Line((44.45, 12.7), (50.8, 12.7))
            Line((50.8, 12.7), (50.8, 25.4))
        make_face()
        with Locations(Location((44.45, 19.05, 0), (0, 0, 180))):
            Circle(SKETCH8_R, mode=Mode.SUBTRACT)
    # profile 3 of 3: a face of its own
    with BuildSketch(Plane.XY.offset(14.605).offset(CUT_EXTRUDE4_START)):
        with BuildLine():
            Line((0, 0), (6.35, 0))
            ThreePointArc((6.35, 0), (10.840128061, 10.840128061), (0, 6.35))
            Line((0, 6.35), (0, 0))
        make_face()
        with Locations(Location((6.35, 6.35, 0), (0, 0, 180))):
            Circle(SKETCH8_R, mode=Mode.SUBTRACT)
    extrude(amount=CUT_EXTRUDE4_DEPTH, mode=Mode.SUBTRACT)

    # Fillet1
    fillet1_edges = [part.edges().sort_by_distance(p)[0] for p in [
        (0, 0, 3.4925),
        (0, 76.2, 3.4925),
        (12.7, 76.2, 3.4925),
        (12.7, 63.5, 7.3025),
        (38.1, 63.5, 7.3025),
        (38.1, 76.2, 7.3025),
        (50.8, 76.2, 7.3025),
        (50.8, 0, 7.3025),
    ]]
    fillet(fillet1_edges, radius=FILLET1_R)

    # Fillet3
    fillet3_edges = [part.edges().sort_by_distance(p)[0] for p in [
        (45.085, 38.1, 8.763),
    ]]
    fillet(fillet3_edges, radius=FILLET3_R)

    # Fillet4: read off the stored shape, not the designer's step
    # Fillet4 outline → Fillet4 (cut)
    with BuildSketch(Plane.XY.offset(FILLET4_START)):
        with BuildLine():
            ThreePointArc((14.382185257, 0), (12.23549345, 1.182312891), (12.087275183, 3.628571429))
            ThreePointArc((12.087275183, 3.628571429), (9.744217773, 0.983270482), (6.35, 0))
            Line((6.35, 0), (14.382185257, 0))
        make_face()
        with BuildLine():
            ThreePointArc((3.628571429, 12.087275183), (1.182312891, 12.23549345), (0, 14.382185257))
            Line((0, 14.382185257), (0, 6.35))
            ThreePointArc((0, 6.35), (0.983270482, 9.744217773), (3.628571429, 12.087275183))
        make_face()
        with BuildLine():
            ThreePointArc((0, 61.817814743), (1.182312891, 63.96450655), (3.628571429, 64.112724817))
            ThreePointArc((3.628571429, 64.112724817), (0.983270483, 66.455782228), (0, 69.85))
            Line((0, 69.85), (0, 61.817814743))
        make_face()
        with BuildLine():
            ThreePointArc((12.7, 69.85), (12.076615103, 67.106210748), (10.328856864, 64.901141742))
            ThreePointArc((10.328856864, 64.901141742), (12.086184936, 65.456182276), (13.756239766, 64.676959064))
            ThreePointArc((13.756239766, 64.676959064), (12.973905651, 65.891501938), (12.7, 67.31))
            Line((12.7, 67.31), (12.7, 69.85))
        make_face()
    extrude(amount=FILLET4_DEPTH, mode=Mode.SUBTRACT)

    # Chamfer1
    # the kernel refuses this chamfer: 3.81 mm, written as the material it takes off along each edge
    with BuildSketch(Plane(origin=(60.598112184, 25.4, 14.605), x_dir=(0, 1, 0), z_dir=(-1, 0, 0)), Plane(origin=(44.45, 12.7, 14.605), x_dir=(0, -1, 0), z_dir=(1, 0, 0))) as chamfer1_piece_1:
        Polygon((CHAMFER1_SIZE, 0), (0, CHAMFER1_SIZE), (0, 0), align=None)
    extrude(amount=16.148112184, mode=Mode.SUBTRACT)
    with BuildSketch(Plane(origin=(44.45, 19.05, 14.605), x_dir=(0, 1, 0), z_dir=(1, 0, 0))) as chamfer1_piece_2:
        Polygon((6.35 + CHAMFER1_SIZE, 0), (6.35, -CHAMFER1_SIZE), (6.35, 0), align=None)
    revolve(axis=Axis((44.45, 19.05, 14.605), (0, 0, 1)), revolution_arc=180, mode=Mode.SUBTRACT)

    # Fillet5
    fillet5_edges = [part.edges().sort_by_distance(p)[0] for p in [
        (25.4, 63.5, 14.605),
        (50.8, 6.35, 14.605),
        (44.45, 76.2, 14.605),
        (38.1, 69.85, 14.605),
        (39.215923164, 75.084076836, 14.605),
        (49.684076836, 75.084076836, 14.605),
        (49.684076836, 1.115923164, 14.605),
        (15.012633306, 63.806574108, 14.605),
        (36.984076836, 64.615923164, 14.605),
        (7.092079369, 63.543509834, 14.605),
        (30.686092628, 0, 14.605),
        (0, 38.1, 14.605),
        (10.840128061, 10.840128061, 14.605),
        (1.182312891, 12.23549345, 14.605),
        (12.23549345, 1.182312891, 14.605),
        (12.086184936, 65.456182276, 14.605),
        (1.182312891, 63.96450655, 14.605),
        (50.8, 50.8, 14.605),
    ]]
    fillet(fillet5_edges, radius=FILLET5_R)


solid = part.part
